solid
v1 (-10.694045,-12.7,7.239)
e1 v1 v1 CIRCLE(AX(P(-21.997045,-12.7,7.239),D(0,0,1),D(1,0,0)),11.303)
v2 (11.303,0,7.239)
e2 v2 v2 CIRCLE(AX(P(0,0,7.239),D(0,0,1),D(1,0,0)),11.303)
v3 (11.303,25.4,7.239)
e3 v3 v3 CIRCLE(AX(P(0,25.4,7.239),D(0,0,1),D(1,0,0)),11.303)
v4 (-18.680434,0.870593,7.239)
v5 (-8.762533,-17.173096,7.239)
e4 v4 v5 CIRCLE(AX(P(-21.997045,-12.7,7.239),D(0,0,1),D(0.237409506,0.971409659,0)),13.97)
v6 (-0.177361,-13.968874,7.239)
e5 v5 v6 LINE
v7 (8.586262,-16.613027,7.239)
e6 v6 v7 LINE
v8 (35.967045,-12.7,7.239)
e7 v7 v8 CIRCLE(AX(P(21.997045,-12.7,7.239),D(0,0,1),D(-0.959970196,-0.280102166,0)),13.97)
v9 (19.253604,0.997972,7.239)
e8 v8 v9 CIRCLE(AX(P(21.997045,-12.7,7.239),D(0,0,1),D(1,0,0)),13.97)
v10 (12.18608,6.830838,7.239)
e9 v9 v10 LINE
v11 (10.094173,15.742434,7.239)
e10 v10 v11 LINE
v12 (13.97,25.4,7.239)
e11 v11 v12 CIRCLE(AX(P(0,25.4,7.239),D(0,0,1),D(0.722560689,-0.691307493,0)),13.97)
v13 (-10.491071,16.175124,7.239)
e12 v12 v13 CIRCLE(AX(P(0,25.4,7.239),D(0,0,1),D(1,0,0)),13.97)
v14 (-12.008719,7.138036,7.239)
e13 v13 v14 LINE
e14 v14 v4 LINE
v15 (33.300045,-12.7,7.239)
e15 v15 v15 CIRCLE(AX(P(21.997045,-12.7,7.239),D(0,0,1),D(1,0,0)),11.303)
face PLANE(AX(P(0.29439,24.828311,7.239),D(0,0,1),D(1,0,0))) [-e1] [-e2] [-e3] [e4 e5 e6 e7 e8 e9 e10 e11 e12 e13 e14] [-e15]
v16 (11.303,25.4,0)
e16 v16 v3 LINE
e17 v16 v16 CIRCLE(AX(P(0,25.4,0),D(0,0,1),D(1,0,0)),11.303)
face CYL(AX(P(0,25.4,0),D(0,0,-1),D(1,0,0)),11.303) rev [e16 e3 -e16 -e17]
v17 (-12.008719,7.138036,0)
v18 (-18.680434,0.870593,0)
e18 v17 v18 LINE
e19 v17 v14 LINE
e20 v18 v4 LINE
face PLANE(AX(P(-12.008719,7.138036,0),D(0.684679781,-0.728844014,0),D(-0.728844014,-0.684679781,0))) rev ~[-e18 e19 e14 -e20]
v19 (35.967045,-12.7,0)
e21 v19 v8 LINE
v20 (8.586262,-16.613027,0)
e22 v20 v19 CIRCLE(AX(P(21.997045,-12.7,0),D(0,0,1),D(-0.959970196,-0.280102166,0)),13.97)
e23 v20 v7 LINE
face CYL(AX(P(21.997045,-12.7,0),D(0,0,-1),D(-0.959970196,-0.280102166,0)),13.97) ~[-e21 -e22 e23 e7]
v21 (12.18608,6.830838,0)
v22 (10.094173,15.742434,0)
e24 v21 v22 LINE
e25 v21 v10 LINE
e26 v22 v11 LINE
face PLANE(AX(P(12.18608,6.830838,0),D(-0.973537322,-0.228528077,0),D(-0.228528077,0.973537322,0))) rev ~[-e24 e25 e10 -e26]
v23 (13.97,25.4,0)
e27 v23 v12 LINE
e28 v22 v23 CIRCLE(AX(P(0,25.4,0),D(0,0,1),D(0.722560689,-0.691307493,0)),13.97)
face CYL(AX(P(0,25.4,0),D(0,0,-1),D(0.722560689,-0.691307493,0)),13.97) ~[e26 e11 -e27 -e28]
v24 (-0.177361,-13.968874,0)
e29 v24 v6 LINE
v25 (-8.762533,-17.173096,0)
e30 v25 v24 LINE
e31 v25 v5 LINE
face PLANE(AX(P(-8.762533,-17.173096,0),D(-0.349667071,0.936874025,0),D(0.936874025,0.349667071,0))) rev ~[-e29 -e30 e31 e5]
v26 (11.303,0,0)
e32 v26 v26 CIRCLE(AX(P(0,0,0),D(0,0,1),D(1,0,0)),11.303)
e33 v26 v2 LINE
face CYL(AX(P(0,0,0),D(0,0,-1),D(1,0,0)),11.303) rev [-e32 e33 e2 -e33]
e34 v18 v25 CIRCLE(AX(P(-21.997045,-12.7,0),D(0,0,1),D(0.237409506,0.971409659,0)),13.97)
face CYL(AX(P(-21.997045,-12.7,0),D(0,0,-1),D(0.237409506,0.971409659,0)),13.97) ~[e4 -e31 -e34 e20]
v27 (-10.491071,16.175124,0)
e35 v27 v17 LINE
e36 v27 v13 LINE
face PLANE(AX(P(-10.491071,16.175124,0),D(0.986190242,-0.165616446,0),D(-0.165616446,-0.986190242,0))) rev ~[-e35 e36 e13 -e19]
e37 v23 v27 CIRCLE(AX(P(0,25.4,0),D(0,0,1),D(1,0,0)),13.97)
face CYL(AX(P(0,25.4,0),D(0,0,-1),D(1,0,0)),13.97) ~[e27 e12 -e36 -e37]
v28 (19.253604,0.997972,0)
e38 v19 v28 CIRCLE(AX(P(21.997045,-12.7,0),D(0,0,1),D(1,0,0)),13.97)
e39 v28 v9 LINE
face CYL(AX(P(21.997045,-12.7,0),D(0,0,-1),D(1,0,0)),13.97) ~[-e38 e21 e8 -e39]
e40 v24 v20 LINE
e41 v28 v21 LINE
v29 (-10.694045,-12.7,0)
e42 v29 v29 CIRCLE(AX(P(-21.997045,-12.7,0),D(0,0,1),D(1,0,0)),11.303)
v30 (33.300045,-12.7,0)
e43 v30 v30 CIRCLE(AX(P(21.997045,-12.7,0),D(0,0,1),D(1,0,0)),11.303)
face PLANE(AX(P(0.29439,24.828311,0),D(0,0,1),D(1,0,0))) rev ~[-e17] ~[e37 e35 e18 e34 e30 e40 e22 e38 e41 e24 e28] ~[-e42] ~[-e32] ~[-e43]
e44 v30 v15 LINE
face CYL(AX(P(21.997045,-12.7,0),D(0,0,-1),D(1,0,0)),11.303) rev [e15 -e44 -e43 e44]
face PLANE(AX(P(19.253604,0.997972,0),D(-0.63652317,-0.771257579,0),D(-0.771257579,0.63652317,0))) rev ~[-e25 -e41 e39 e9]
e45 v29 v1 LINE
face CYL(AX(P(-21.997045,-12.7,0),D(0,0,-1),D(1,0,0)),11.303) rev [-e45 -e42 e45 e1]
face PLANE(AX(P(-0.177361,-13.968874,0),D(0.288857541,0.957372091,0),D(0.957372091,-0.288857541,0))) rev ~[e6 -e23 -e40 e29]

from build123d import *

# Parameters (mm, degrees)
F0_R     = 11.303
F1_DEPTH = 7.239


# Not quite as in the source:
# - a feature names something its author has since deleted; it is built from what else it names


with BuildPart() as f1:
    # F0 (on Top) → F1 (new body)
    with BuildSketch(Plane.XY):
        with BuildLine():
            ThreePointArc((-5.8198711326, 12.7), (0, 13.97), (5.8198711326, 12.7))
            ThreePointArc((5.8198711326, 12.7), (8.1011295792, 14.0187610718), (10.0941728301, 15.7424343193))
            ThreePointArc((10.0941728301, 15.7424343193), (12.9648851602, 20.1968612567), (13.97, 25.4))
            ThreePointArc((13.97, 25.4), (-4.9295356548, 38.4713648189), (-10.4910706124, 16.1751239897))
            ThreePointArc((-10.4910706124, 16.1751239897), (-8.3385146662, 14.191517803), (-5.8198711326, 12.7))
        make_face()
        with Locations((0, 25.4)):
            Circle(F0_R, mode=Mode.SUBTRACT)
        with BuildLine():
            ThreePointArc((19.2536035907, 0.9979716684), (16.4594722687, 0.1256066293), (13.9084581944, -1.3098437524))
            ThreePointArc((13.9084581944, -1.3098437524), (12.0983748909, -6.985), (8.0885870618, -11.3901562476))
            ThreePointArc((8.0885870618, -11.3901562476), (8.0900384281, -14.0251645508), (8.5862616229, -16.6130272607))
            ThreePointArc((8.5862616229, -16.6130272607), (23.9734375051, -26.5294892776), (35.9670452561, -12.7))
            ThreePointArc((35.9670452561, -12.7), (30.852411424, -1.8952144846), (19.2536035907, 0.9979716684))
        make_face()
        with Locations((21.9970452561, -12.7)):
            Circle(F0_R, mode=Mode.SUBTRACT)
        with BuildLine():
            ThreePointArc((-8.0270452561, -12.7), (-8.042439189, -12.044355651), (-8.0885870618, -11.3901562476))
            ThreePointArc((-8.0885870618, -11.3901562476), (-12.0983748909, -6.985), (-13.9084581944, -1.3098437524))
            ThreePointArc((-13.9084581944, -1.3098437524), (-16.1911680073, 0.006403479), (-18.680434453, 0.8705929414))
            ThreePointArc((-18.680434453, 0.8705929414), (-34.2395365622, -19.4292129272), (-8.7625329783, -17.1730956581))
            ThreePointArc((-8.7625329783, -17.1730956581), (-8.2121434334, -14.9665793035), (-8.0270452561, -12.7))
        make_face()
        with Locations((-21.9970452561, -12.7)):
            Circle(F0_R, mode=Mode.SUBTRACT)
        with BuildLine():
            ThreePointArc((13.9084581944, -1.3098437524), (13.9546060671, -0.655644349), (13.97, 0))
            ThreePointArc((13.97, 0), (13.5166645575, 3.5299687308), (12.1860802806, 6.8308379717))
            ThreePointArc((12.1860802806, 6.8308379717), (9.4691782802, 10.2711032853), (5.8198711326, 12.7))
            ThreePointArc((5.8198711326, 12.7), (0, 11.43), (-5.8198711326, 12.7))
            ThreePointArc((-5.8198711326, 12.7), (-9.3380147919, 10.3904946824), (-12.0087193529, 7.1380361097))
            ThreePointArc((-12.0087193529, 7.1380361097), (-13.6296255101, 3.0649973009), (-13.9084581944, -1.3098437524))
            ThreePointArc((-13.9084581944, -1.3098437524), (-9.8986703653, -5.715), (-8.0885870618, -11.3901562476))
            ThreePointArc((-8.0885870618, -11.3901562476), (-4.3294249569, -13.2822053719), (-0.1773609276, -13.9688740814))
            ThreePointArc((-0.1773609276, -13.9688740814), (4.1604472299, -13.3361005863), (8.0885870618, -11.3901562476))
            ThreePointArc((8.0885870618, -11.3901562476), (9.8986703653, -5.715), (13.9084581944, -1.3098437524))
        make_face()
        Circle(F0_R, mode=Mode.SUBTRACT)
        with BuildLine():
            ThreePointArc((-13.9084581944, -1.3098437524), (-13.6296255101, 3.0649973009), (-12.0087193529, 7.1380361097))
            Line((-12.0087193529, 7.1380361097), (-18.680434453, 0.8705929414))
            ThreePointArc((-18.680434453, 0.8705929414), (-16.1911680073, 0.006403479), (-13.9084581944, -1.3098437524))
        make_face()
        with BuildLine():
            ThreePointArc((-12.0087193529, 7.1380361097), (-9.3380147919, 10.3904946824), (-5.8198711326, 12.7))
            ThreePointArc((-5.8198711326, 12.7), (-8.3385146662, 14.191517803), (-10.4910706124, 16.1751239897))
            Line((-10.4910706124, 16.1751239897), (-12.0087193529, 7.1380361097))
        make_face()
        with BuildLine():
            ThreePointArc((5.8198711326, 12.7), (9.4691782802, 10.2711032853), (12.1860802806, 6.8308379717))
            Line((12.1860802806, 6.8308379717), (10.0941728301, 15.7424343193))
            ThreePointArc((10.0941728301, 15.7424343193), (8.1011295792, 14.0187610718), (5.8198711326, 12.7))
        make_face()
        with BuildLine():
            ThreePointArc((12.1860802806, 6.8308379717), (13.5166645575, 3.5299687308), (13.97, 0))
            ThreePointArc((13.97, 0), (13.9546060671, -0.655644349), (13.9084581944, -1.3098437524))
            ThreePointArc((13.9084581944, -1.3098437524), (16.4594722687, 0.1256066293), (19.2536035907, 0.9979716684))
            Line((19.2536035907, 0.9979716684), (12.1860802806, 6.8308379717))
        make_face()
        with BuildLine():
            ThreePointArc((8.5862616229, -16.6130272607), (8.0900384281, -14.0251645508), (8.0885870618, -11.3901562476))
            ThreePointArc((8.0885870618, -11.3901562476), (4.1604472299, -13.3361005863), (-0.1773609276, -13.9688740814))
            Line((-0.1773609276, -13.9688740814), (8.5862616229, -16.6130272607))
        make_face()
        with BuildLine():
            Line((-8.7625329783, -17.1730956581), (-0.1773609276, -13.9688740814))
            ThreePointArc((-0.1773609276, -13.9688740814), (-4.3294249569, -13.2822053719), (-8.0885870618, -11.3901562476))
            ThreePointArc((-8.0885870618, -11.3901562476), (-8.042439189, -12.044355651), (-8.0270452561, -12.7))
            ThreePointArc((-8.0270452561, -12.7), (-8.2121434334, -14.9665793035), (-8.7625329783, -17.1730956581))
        make_face()
        with BuildLine():
            ThreePointArc((8.0885870618, -11.3901562476), (12.0983748909, -6.985), (13.9084581944, -1.3098437524))
            ThreePointArc((13.9084581944, -1.3098437524), (9.8986703653, -5.715), (8.0885870618, -11.3901562476))
        make_face()
        with BuildLine():
            ThreePointArc((-5.8198711326, 12.7), (0, 11.43), (5.8198711326, 12.7))
            ThreePointArc((5.8198711326, 12.7), (0, 13.97), (-5.8198711326, 12.7))
        make_face()
        with BuildLine():
            ThreePointArc((-13.9084581944, -1.3098437524), (-12.0983748909, -6.985), (-8.0885870618, -11.3901562476))
            ThreePointArc((-8.0885870618, -11.3901562476), (-9.8986703653, -5.715), (-13.9084581944, -1.3098437524))
        make_face()
    extrude(amount=F1_DEPTH)


solid = f1.part
